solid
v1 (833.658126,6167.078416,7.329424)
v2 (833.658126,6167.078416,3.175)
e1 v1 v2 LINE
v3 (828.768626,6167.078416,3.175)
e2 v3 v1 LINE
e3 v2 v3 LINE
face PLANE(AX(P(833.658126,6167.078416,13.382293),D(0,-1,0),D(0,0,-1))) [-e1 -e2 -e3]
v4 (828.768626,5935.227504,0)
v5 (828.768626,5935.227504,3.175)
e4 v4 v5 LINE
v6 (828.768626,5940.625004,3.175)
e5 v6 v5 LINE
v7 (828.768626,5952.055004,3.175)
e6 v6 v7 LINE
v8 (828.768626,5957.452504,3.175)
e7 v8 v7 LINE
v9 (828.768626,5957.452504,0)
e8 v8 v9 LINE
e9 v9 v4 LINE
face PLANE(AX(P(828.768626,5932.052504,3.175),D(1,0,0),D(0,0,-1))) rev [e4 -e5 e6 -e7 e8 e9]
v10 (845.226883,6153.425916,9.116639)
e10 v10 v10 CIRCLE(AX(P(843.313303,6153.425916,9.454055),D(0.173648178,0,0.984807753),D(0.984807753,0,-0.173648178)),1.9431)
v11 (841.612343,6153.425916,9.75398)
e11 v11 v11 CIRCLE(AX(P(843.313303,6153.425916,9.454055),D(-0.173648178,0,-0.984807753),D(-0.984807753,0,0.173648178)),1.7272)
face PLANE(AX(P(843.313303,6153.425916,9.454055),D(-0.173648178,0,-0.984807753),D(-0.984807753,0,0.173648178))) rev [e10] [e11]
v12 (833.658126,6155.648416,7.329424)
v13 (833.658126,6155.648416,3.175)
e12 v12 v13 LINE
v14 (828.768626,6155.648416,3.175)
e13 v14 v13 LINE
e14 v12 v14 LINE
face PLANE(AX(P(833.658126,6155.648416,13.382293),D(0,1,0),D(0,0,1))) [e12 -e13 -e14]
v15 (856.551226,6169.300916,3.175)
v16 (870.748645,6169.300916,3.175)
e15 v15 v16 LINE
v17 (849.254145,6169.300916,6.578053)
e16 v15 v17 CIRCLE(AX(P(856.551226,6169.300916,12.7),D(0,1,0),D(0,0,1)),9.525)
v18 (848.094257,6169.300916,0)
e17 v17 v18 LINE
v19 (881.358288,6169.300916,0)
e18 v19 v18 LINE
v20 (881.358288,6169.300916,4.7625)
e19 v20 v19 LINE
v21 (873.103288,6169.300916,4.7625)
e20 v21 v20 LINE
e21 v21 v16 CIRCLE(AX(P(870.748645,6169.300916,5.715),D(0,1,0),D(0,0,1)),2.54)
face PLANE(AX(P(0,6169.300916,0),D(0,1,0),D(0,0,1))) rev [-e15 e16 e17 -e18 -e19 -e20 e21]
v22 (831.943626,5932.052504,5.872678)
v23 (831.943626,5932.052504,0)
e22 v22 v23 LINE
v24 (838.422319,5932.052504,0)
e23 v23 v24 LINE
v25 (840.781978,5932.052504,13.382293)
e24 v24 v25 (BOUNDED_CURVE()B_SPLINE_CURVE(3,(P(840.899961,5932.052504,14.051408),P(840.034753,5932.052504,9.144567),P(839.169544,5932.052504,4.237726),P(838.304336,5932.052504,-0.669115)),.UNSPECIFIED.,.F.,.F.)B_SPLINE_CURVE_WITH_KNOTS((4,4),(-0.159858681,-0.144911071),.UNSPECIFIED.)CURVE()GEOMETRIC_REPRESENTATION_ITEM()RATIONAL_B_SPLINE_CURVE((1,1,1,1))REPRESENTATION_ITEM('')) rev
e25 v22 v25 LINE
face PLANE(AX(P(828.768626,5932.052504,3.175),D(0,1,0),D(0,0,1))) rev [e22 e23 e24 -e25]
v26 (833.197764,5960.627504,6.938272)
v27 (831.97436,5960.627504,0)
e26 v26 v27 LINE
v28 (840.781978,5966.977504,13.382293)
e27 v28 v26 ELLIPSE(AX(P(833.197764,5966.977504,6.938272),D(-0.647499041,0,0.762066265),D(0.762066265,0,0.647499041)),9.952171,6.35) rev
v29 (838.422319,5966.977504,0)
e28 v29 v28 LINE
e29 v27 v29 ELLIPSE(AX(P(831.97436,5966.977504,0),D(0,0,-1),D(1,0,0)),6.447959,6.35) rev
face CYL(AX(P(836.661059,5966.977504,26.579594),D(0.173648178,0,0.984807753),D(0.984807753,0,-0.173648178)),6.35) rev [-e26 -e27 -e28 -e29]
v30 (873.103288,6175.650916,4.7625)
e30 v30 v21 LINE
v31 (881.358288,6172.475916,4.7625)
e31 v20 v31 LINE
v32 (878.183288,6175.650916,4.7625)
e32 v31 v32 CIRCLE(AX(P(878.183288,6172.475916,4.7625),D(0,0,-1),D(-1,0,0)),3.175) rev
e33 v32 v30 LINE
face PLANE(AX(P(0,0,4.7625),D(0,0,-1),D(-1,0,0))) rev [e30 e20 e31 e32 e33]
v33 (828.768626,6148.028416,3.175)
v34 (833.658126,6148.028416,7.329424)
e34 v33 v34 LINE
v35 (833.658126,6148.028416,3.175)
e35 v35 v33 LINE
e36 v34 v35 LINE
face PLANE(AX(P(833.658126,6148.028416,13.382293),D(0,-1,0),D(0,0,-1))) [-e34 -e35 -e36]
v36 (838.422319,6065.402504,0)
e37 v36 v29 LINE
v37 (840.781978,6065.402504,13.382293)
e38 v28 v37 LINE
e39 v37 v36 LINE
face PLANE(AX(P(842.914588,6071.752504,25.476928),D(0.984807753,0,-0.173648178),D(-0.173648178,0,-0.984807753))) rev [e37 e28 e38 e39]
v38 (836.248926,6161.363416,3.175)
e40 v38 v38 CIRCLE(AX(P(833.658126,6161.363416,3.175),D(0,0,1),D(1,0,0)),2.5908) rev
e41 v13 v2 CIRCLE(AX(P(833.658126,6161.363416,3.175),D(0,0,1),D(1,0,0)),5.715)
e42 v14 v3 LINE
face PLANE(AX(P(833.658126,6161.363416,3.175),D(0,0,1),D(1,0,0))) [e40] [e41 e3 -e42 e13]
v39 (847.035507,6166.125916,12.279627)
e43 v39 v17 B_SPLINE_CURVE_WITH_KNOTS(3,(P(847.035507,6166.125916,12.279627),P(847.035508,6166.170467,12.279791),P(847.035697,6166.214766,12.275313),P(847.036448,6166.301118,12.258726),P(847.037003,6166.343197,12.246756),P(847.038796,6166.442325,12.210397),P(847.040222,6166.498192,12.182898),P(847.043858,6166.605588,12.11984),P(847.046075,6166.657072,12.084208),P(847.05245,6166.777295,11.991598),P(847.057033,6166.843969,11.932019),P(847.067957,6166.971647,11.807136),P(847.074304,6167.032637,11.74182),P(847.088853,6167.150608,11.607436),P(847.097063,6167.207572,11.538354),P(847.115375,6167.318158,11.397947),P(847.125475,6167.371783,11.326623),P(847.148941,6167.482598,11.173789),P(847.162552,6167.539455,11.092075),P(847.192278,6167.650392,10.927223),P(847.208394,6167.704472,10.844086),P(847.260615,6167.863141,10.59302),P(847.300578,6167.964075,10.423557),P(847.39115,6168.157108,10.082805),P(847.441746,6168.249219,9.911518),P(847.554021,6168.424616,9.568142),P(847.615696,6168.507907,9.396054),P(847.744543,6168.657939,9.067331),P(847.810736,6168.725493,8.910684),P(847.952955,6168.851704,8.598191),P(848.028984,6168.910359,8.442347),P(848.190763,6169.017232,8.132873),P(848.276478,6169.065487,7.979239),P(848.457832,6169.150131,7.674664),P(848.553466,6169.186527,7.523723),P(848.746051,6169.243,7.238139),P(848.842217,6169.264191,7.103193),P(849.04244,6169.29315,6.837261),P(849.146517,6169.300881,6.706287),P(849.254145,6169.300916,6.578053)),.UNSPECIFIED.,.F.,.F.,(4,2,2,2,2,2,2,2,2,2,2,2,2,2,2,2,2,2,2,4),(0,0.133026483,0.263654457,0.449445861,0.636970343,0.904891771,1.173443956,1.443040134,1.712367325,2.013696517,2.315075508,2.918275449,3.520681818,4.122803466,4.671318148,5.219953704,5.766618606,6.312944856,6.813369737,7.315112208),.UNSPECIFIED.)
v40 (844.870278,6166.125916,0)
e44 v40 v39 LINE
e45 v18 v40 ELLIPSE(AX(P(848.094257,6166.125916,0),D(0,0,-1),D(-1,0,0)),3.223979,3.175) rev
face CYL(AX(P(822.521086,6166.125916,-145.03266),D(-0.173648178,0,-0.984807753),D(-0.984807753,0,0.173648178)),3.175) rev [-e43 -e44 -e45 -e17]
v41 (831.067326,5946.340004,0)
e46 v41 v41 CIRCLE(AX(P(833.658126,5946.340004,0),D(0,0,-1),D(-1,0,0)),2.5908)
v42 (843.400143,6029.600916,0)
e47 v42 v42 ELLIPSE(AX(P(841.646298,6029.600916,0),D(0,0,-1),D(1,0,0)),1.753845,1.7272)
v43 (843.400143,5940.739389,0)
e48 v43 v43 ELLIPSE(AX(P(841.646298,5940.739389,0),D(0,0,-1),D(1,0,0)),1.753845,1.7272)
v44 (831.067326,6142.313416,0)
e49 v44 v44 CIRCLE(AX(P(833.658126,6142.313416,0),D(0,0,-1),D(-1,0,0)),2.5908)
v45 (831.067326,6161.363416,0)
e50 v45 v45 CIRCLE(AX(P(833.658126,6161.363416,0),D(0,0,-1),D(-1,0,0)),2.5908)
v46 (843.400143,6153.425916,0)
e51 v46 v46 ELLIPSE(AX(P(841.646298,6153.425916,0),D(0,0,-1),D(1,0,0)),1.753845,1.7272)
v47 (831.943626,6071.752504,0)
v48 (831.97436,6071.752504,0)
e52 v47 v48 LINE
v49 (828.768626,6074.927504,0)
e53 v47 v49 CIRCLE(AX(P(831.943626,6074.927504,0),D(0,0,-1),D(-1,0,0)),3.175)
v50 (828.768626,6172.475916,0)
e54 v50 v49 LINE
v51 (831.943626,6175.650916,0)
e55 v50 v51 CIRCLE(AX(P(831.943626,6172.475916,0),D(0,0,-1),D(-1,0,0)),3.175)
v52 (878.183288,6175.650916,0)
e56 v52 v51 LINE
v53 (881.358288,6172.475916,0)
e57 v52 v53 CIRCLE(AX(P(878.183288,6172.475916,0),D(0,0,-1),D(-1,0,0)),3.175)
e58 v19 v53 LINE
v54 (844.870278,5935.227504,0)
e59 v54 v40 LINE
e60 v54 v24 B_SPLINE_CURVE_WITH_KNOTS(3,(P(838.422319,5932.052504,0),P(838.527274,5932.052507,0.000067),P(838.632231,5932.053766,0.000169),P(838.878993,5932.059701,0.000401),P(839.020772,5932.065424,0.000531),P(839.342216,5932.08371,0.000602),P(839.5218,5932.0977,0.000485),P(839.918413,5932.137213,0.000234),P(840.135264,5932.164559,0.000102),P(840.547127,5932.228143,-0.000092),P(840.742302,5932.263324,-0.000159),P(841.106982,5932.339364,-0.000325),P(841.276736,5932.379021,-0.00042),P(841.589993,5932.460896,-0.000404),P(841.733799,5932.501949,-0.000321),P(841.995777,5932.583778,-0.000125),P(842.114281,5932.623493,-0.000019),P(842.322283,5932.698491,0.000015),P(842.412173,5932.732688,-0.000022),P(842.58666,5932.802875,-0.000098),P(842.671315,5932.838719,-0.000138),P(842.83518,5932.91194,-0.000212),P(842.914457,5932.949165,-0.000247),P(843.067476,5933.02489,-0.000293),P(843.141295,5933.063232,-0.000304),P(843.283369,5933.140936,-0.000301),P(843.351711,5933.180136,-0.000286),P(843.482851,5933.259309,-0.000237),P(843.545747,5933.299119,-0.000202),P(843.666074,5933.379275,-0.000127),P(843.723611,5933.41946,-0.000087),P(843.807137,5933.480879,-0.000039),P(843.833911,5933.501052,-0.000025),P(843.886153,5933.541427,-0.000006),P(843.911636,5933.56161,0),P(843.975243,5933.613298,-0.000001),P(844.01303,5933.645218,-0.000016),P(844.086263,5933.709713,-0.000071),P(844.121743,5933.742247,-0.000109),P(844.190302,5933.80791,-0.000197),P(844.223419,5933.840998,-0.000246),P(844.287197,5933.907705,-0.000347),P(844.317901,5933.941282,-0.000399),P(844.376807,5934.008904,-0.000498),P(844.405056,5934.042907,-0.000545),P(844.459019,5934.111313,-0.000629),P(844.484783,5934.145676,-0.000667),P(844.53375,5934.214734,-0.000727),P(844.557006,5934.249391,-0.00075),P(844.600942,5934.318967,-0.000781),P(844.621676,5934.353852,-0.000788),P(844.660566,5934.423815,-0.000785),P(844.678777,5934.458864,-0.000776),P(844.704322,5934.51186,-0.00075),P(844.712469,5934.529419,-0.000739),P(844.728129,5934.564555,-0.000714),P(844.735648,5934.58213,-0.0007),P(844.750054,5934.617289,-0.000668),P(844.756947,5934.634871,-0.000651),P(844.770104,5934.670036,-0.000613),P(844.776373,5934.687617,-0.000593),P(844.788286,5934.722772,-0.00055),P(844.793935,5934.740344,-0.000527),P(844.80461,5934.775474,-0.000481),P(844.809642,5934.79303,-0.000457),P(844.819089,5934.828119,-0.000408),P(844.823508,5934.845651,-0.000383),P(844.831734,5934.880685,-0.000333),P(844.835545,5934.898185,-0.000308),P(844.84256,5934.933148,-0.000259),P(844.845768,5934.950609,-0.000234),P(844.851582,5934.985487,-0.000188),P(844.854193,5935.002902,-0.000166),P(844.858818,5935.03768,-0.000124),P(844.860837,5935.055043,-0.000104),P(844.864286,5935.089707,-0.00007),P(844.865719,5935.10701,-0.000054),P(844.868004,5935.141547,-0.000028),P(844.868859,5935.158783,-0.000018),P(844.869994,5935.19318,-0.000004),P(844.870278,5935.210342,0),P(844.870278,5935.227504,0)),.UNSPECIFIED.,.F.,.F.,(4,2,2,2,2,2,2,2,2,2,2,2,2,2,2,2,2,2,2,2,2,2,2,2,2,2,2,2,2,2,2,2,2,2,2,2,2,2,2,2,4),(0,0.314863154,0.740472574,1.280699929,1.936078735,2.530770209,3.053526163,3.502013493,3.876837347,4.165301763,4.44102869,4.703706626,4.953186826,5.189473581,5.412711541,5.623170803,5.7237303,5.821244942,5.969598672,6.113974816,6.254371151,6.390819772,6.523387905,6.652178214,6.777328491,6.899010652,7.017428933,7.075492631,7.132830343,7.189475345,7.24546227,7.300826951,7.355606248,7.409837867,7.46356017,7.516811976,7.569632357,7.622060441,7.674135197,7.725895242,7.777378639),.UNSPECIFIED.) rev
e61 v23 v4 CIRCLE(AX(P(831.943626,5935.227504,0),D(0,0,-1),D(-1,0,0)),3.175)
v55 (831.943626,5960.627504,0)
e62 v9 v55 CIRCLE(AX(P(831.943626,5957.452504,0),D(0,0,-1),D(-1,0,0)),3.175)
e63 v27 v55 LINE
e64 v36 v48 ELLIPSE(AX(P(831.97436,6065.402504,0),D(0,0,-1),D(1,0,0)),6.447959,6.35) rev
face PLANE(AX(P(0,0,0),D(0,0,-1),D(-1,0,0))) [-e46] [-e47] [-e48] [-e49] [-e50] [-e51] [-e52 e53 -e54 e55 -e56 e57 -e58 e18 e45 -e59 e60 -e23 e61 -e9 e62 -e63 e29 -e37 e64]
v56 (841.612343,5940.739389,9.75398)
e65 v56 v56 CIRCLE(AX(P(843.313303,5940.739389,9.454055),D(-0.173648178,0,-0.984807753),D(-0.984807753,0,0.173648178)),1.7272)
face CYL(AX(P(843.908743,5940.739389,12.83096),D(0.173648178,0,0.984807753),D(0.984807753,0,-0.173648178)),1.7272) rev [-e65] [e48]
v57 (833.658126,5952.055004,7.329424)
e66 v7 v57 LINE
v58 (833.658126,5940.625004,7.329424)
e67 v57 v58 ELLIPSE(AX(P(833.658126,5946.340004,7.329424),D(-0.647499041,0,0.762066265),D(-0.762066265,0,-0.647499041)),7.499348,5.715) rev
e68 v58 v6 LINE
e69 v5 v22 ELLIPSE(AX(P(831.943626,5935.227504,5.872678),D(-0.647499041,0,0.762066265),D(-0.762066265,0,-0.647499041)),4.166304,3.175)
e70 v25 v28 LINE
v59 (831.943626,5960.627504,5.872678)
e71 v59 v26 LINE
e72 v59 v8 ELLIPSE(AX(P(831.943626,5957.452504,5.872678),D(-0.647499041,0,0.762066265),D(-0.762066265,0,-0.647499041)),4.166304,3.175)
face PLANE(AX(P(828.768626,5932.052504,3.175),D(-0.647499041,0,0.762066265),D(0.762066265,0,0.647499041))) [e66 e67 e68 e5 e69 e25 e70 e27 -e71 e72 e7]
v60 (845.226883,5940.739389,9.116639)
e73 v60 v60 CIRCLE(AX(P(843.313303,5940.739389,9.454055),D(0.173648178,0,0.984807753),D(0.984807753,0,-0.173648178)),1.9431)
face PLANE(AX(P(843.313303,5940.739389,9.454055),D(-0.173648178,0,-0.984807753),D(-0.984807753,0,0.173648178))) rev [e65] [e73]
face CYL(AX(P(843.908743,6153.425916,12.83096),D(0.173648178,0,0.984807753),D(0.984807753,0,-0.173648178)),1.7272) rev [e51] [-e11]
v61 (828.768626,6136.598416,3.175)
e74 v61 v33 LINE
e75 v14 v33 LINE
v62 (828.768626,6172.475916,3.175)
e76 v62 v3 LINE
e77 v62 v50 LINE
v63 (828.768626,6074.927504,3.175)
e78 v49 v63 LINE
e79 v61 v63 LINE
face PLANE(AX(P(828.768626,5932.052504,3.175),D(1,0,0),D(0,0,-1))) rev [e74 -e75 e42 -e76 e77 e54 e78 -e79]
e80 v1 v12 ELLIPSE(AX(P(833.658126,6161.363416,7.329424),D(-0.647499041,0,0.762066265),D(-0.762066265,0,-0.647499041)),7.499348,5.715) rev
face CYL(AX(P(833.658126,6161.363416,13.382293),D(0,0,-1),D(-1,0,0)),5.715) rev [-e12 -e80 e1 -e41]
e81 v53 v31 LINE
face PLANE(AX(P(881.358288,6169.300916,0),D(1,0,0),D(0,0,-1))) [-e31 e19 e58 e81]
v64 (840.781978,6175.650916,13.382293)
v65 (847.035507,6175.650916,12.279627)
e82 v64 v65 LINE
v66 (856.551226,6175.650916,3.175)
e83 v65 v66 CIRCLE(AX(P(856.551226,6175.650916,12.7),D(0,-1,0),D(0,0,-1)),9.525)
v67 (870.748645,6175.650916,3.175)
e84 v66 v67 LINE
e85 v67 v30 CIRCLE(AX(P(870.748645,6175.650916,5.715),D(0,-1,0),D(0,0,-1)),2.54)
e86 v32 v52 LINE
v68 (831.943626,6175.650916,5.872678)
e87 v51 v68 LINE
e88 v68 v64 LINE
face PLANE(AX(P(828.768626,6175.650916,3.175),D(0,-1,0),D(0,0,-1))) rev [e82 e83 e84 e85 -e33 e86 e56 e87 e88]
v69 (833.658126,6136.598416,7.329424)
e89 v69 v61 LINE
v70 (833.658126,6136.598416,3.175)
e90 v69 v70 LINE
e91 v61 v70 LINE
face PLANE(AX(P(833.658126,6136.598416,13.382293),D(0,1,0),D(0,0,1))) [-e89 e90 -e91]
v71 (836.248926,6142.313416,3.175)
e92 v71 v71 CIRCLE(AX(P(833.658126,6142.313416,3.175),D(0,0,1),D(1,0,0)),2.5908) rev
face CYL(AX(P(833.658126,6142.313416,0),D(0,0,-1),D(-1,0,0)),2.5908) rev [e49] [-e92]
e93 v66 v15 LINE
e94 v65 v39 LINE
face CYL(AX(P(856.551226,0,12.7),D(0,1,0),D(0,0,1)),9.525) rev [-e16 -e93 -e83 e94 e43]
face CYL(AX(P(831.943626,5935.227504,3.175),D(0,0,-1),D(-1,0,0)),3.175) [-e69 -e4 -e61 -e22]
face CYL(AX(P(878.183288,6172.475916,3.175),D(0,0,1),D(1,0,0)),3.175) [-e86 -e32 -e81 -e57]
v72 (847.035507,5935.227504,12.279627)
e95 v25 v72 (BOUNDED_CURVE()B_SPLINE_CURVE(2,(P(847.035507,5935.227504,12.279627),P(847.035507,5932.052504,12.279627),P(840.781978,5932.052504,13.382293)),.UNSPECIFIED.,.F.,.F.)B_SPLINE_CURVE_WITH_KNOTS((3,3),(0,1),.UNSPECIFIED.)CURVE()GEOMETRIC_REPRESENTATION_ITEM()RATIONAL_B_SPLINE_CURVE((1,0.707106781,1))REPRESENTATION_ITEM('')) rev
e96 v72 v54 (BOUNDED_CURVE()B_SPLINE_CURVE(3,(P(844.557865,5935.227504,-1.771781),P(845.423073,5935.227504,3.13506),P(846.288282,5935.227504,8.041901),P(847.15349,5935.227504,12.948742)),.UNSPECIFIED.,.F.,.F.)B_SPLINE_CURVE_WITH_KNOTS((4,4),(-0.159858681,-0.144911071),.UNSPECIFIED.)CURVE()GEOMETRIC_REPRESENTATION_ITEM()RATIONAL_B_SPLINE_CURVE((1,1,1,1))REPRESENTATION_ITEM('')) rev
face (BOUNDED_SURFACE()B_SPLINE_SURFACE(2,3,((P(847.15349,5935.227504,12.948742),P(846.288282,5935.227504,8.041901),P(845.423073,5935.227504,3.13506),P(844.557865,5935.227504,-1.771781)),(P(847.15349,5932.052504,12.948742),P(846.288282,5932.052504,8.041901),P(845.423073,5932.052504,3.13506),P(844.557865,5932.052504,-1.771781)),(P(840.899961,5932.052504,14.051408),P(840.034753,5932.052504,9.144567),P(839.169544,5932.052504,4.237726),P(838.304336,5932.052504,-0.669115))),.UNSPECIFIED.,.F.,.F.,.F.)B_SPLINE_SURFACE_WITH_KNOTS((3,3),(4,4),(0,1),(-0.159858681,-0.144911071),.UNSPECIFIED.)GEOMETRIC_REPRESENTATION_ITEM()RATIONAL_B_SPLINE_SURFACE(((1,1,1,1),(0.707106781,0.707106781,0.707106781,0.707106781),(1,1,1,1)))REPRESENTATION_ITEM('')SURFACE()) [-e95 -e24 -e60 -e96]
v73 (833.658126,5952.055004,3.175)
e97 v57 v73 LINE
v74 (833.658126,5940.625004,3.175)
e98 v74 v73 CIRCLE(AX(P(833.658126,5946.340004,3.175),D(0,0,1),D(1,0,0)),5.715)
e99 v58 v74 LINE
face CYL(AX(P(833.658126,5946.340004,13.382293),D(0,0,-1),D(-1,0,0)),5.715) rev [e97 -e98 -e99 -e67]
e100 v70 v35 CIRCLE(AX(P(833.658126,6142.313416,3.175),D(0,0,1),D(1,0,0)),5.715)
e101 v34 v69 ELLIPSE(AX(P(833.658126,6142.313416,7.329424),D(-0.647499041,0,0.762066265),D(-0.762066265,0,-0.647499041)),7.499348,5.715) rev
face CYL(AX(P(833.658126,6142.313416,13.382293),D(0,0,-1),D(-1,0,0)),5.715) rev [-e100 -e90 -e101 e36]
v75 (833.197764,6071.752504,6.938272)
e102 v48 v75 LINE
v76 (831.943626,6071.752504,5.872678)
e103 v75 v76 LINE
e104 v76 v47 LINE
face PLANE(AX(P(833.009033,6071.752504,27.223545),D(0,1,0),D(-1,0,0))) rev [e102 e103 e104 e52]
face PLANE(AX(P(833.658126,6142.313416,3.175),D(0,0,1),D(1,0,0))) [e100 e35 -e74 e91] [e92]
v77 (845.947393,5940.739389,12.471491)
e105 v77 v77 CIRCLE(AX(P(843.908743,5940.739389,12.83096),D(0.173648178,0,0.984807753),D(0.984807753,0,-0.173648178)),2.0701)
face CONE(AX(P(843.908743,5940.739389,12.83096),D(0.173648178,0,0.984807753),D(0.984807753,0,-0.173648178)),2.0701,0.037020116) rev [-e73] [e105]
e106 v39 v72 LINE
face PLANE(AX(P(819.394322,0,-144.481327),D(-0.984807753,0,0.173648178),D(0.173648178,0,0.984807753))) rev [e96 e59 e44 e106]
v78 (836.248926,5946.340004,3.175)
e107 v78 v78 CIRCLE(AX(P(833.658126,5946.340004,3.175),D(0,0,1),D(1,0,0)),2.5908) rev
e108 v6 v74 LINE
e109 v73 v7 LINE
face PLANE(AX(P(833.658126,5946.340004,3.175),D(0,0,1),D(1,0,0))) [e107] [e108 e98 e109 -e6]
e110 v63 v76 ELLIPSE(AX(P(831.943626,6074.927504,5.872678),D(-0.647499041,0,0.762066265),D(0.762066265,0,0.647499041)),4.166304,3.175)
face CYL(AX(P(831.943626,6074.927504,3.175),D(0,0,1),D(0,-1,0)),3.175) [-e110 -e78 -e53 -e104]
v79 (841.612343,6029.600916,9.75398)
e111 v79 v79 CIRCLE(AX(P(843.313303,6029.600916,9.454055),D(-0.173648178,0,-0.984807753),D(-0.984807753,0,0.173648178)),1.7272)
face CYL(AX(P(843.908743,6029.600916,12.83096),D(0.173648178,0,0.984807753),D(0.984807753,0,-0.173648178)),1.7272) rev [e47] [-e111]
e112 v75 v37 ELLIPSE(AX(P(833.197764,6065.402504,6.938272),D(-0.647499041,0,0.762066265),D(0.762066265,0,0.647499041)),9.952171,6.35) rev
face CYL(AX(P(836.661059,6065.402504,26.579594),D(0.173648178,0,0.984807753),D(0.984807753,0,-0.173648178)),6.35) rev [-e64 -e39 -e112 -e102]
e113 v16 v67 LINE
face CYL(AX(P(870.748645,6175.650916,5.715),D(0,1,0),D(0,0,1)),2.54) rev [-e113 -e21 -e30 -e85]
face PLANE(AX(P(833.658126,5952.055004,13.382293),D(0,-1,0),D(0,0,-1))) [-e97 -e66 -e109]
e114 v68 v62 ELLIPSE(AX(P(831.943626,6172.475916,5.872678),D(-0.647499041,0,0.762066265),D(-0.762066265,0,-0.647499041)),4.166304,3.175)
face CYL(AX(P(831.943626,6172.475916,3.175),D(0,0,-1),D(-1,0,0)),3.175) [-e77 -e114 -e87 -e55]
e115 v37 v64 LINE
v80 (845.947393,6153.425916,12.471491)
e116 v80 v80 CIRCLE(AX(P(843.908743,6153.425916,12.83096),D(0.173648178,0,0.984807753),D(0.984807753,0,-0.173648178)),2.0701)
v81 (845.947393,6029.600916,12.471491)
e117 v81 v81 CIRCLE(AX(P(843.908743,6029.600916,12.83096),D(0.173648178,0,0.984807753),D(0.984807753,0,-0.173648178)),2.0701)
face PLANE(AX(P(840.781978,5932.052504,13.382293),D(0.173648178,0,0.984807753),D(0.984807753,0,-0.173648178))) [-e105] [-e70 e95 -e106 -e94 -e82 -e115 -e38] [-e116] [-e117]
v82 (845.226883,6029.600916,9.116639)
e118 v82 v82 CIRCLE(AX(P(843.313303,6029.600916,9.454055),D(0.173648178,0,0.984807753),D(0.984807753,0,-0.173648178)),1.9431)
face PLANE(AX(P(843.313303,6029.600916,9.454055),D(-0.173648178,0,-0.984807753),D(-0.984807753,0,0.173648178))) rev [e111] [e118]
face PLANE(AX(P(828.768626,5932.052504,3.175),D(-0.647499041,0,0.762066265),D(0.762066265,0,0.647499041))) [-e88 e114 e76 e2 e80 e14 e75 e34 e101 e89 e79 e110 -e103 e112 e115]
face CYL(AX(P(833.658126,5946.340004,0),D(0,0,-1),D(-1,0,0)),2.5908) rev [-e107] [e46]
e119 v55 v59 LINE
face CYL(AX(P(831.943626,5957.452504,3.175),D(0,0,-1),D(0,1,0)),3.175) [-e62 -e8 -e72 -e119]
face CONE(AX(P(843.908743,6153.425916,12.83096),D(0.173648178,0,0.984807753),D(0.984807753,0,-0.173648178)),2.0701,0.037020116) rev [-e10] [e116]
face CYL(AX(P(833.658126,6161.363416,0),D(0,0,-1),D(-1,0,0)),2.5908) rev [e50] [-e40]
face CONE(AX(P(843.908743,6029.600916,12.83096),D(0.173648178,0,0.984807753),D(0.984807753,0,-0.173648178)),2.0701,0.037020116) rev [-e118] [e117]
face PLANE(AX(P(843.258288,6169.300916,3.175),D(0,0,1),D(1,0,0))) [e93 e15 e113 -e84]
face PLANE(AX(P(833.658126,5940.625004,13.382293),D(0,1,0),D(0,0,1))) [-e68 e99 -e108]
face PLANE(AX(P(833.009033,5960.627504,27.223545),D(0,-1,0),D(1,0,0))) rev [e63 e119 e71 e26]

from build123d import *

# Parameters (mm, degrees)
SKETCH2_W                  = 82.738044028
SKETCH2_H                  = 243.598411898
BOSS_EXTRUDE1_DEPTH        = 3.175
BOSS_EXTRUDE2_DEPTH        = 243.598412
CUT_EXTRUDE1_DEPTH         = 6253.234293578
CUT_EXTRUDE1_DEPTH_BACK    = 6253.234293578
SKETCH3_W                  = 10.058364279
SKETCH3_H                  = 111.125
FILLET1_R                  = 6.35
CUT_EXTRUDE2_DEPTH         = 6243.564603497
DELETEFACE2_START          = 830.447299741
DELETEFACE2_OUTLINE_W      = 243.598411898
DELETEFACE2_OUTLINE_H      = 6
DELETEFACE2_DEPTH          = 0.551332964
F_6_0_204_DIAMETER_HOLE1_D = 5.1816
CUT_EXTRUDE3_START         = 3.175
CUT_EXTRUDE3_DEPTH         = 6231.095925463
SKETCH10_W                 = 38.1
SKETCH10_H                 = 3.175
BOSS_EXTRUDE4_DEPTH        = 6.35
BOSS_EXTRUDE6_DEPTH        = 1.5875
CUT_EXTRUDE4_DEPTH         = 913.829845298
FILLET2_R                  = 9.525
FILLET3_R                  = 3.175
SKETCH13_W                 = 8.255
SKETCH13_H                 = 6.35
BOSS_EXTRUDE5_DEPTH        = 1.5875
FILLET4_R                  = 2.54
FILLET5_SIZE               = 6.35
FILLET5_SIZE_2             = 3.175
FILLET6_R                  = 3.175
HOLE1_AT_2_COUNT           = 2
HOLE1_AT_2_PITCH           = 123.825
HOLE1_AT_3_COUNT           = 2
HOLE1_AT_3_PITCH           = 212.6865263
F_4_CLEARANCE_HOLE1_D      = 3.4544


# Read off the part's stored shape, not the designer's step: DeleteFace2
with BuildPart() as part:
    # Sketch2 → Boss-Extrude1 (new body)
    with BuildSketch(Plane.XY):
        with Locations((870.137648104, 6053.851709568)):
            Rectangle(SKETCH2_W, SKETCH2_H)
    extrude(amount=BOSS_EXTRUDE1_DEPTH)

    # Sketch5 → Boss-Extrude2 (add, through all)
    with BuildSketch(Plane(origin=(0, 6175.650915517, 0), x_dir=(1, 0, 0), z_dir=(0, 1, 0))):
        Polygon((828.76862609, -3.175), (840.781978058, -13.382293294), (845.472124982, -12.555293847), (843.81812609, -3.175), align=None)
    extrude(amount=-BOSS_EXTRUDE2_DEPTH)

    # Sketch3 → Cut-Extrude1 (cut, two sides: drawn at the far end of the back side and taken through both)
    with BuildSketch(Plane(origin=(1789.89403363, 0, -153.971769821), x_dir=(-0.9848077530122082, 0, 0.17364817766692958), z_dir=(-0.17364817766692958, 0, -0.9848077530122082)).offset(-CUT_EXTRUDE1_DEPTH_BACK)):
        with Locations((968.782821029, 6016.190003619)):
            Rectangle(SKETCH3_W, SKETCH3_H)
    extrude(amount=CUT_EXTRUDE1_DEPTH + CUT_EXTRUDE1_DEPTH_BACK, mode=Mode.SUBTRACT)

    # Fillet1
    fillet1_edges = [part.edges().sort_by_distance(p)[0] for p in [
        (839.602148372, 6071.752503619, 6.691146647),
        (839.602148372, 5960.627503619, 6.691146647),
    ]]
    fillet(fillet1_edges, radius=FILLET1_R)

    # Sketch4 → Cut-Extrude2 (cut, through all)
    with BuildSketch(Plane.XY.offset(3.175)):
        Polygon((843.81812609, 6170.570915517), (843.81812609, 6175.650915517), (911.506670118, 6175.650915517), (911.506670118, 5932.052503619), (905.156670118, 5932.052503619), (843.81812609, 5932.052503619), align=None)
    extrude(amount=-CUT_EXTRUDE2_DEPTH, mode=Mode.SUBTRACT)

    # DeleteFace2 outline → DeleteFace2 (cut)
    with BuildSketch(Plane(origin=(0, 0, 0), x_dir=(0, 1, 0), z_dir=(0.984807753012209, 0, -0.173648177666925)).offset(DELETEFACE2_START)):
        with Locations((6053.851709568, 148)):
            Rectangle(DELETEFACE2_OUTLINE_W, DELETEFACE2_OUTLINE_H)
    extrude(amount=DELETEFACE2_DEPTH, mode=Mode.SUBTRACT)

    # #6 (0.204) Diameter Hole1 (through all)
    with Locations(Plane(origin=(0, 0, 0), x_dir=(-1, 0, 0), z_dir=(0, 0, -1))):
        with Locations((-833.65812609, 6161.363415517), (-833.65812609, 6142.313415517), (-833.65812609, 5946.340003619)):
            Hole(F_6_0_204_DIAMETER_HOLE1_D / 2)

    # Sketch8 → Cut-Extrude3 (cut, through all)
    with BuildSketch(Plane.XY.offset(CUT_EXTRUDE3_START)):
        with BuildLine():
            Line((833.65812609, 6155.648415517), (828.76862609, 6155.648415517))
            ThreePointArc((828.76862609, 6155.648415517), (823.05362609, 6161.363415517), (828.76862609, 6167.078415517))
            Line((828.76862609, 6167.078415517), (833.65812609, 6167.078415517))
            ThreePointArc((833.65812609, 6167.078415517), (839.37312609, 6161.363415517), (833.65812609, 6155.648415517))
        make_face()
        with BuildLine():
            Line((833.65812609, 6136.598415517), (828.76862609, 6136.598415517))
            ThreePointArc((828.76862609, 6136.598415517), (823.05362609, 6142.313415517), (828.76862609, 6148.028415517))
            Line((828.76862609, 6148.028415517), (833.65812609, 6148.028415517))
            ThreePointArc((833.65812609, 6148.028415517), (839.37312609, 6142.313415517), (833.65812609, 6136.598415517))
        make_face()
        with BuildLine():
            Line((833.65812609, 5940.625003619), (828.76862609, 5940.625003619))
            ThreePointArc((828.76862609, 5940.625003619), (823.05362609, 5946.340003619), (828.76862609, 5952.055003619))
            Line((828.76862609, 5952.055003619), (833.65812609, 5952.055003619))
            ThreePointArc((833.65812609, 5952.055003619), (839.37312609, 5946.340003619), (833.65812609, 5940.625003619))
        make_face()
    extrude(amount=CUT_EXTRUDE3_DEPTH, mode=Mode.SUBTRACT)

    # Sketch10 → Boss-Extrude4 (add)
    with BuildSketch(Plane(origin=(0, 6175.650915517, 0), x_dir=(1, 0, 0), z_dir=(0, 1, 0))):
        with Locations((862.308287926, -1.5875)):
            Rectangle(SKETCH10_W, SKETCH10_H)
    extrude(amount=-BOSS_EXTRUDE4_DEPTH)

    # Sketch14 → Boss-Extrude6 (add)
    with BuildSketch(Plane(origin=(817.830939253, 0, -144.205660248), x_dir=(-0.17364817766692534, 0, -0.9848077530122089), z_dir=(0.9848077530122089, 0, -0.17364817766692534))):
        Polygon((-149.654244494, 6169.300915517), (-149.654244494, 6175.650915517), (-159.179244494, 6175.650915517), (-159.179244494, 5932.052503619), (-146.430265001, 5932.052503619), (-146.430265001, 6169.300915517), align=None)
    extrude(amount=BOSS_EXTRUDE6_DEPTH)

    # Sketch15 → Cut-Extrude4 (cut, through all)
    with BuildSketch(Plane(origin=(0, 6169.300915517, 0), x_dir=(1, 0, 0), z_dir=(0, 1, 0))):
        Polygon((843.258287926, 0), (844.870277672, 0), (844.821670234, 0.275666482), align=None)
    extrude(amount=-CUT_EXTRUDE4_DEPTH, mode=Mode.SUBTRACT)

    # Fillet2
    # the kernel refuses this fillet: 9.525 mm, written as the material it adds along each edge
    with BuildSketch(Plane(origin=(845.430115836, 6175.650915517, 3.175), x_dir=(1, 0, 0), z_dir=(0, -1, 0))) as fillet2_piece_1:
        with BuildLine():
            CenterArc((11.121110651, 9.525), FILLET2_R, 182.529491184, 87.470508816)
            Line((1.605391454, 9.104627365), (1.41507707, 9.096219913))
            ThreePointArc((1.41507707, 9.096219913), (0.61508985, 4.585393661), (-0.187605877, 0.033079978))
            Line((-0.187605877, 0.033079978), (0, -0.1905))
            Line((0, -0.1905), (11.121110651, -0.1905))
            Line((11.121110651, -0.1905), (11.121110651, 0))
        make_face()
    extrude(amount=6.35)

    # Fillet3
    # the kernel refuses this fillet: 3.175 mm, written as the material it adds along each edge
    with BuildSketch(Plane(origin=(847.03550729, 6169.300915517, 12.279627365), x_dir=(0.9848077530122001, 0, -0.17364817766697505), z_dir=(-0.17364817766697507, 0, -0.9848077530122002))) as fillet3_piece_1_section:
        with BuildLine():
            CenterArc((FILLET3_R, FILLET3_R), FILLET3_R, 180, 90)
            Line((0, FILLET3_R), (0, 0))
            Line((0, 0), (FILLET3_R, 0))
        make_face()
    fillet3_piece_1 = extrude(amount=20.406560411, mode=Mode.PRIVATE)
    fillet3_piece_1 = fillet3_piece_1 - Plane(origin=(856.551226487, 6168.523076842, 12.7), x_dir=(1, 0, 0), z_dir=(0, 1, 0)) * Cylinder(9.525, 54, mode=Mode.PRIVATE)
    fillet3_piece_1 = split(fillet3_piece_1, bisect_by=Plane(origin=(846.439228991, 6168.523076842, 0), z_dir=(0, 0, 1)), keep=Keep.TOP, mode=Mode.PRIVATE)
    add(fillet3_piece_1)

    # Sketch13 → Boss-Extrude5 (add)
    with BuildSketch(Plane.XY.offset(3.175)):
        with Locations((877.230787926, 6172.475915517)):
            Rectangle(SKETCH13_W, SKETCH13_H)
    extrude(amount=BOSS_EXTRUDE5_DEPTH)

    # Fillet4
    # the kernel refuses this fillet: 2.54 mm, written as the material it adds along each edge
    with BuildSketch(Plane(origin=(873.103287926, 6175.650915517, 3.175), x_dir=(-1, 0, 0), z_dir=(0, -1, 0))) as fillet4_piece_1:
        with BuildLine():
            CenterArc((2.35464302, -2.54), FILLET4_R, 90, 67.975687163)
            Line((0, -1.5875), (-0.04709286, -1.56845))
            ThreePointArc((-0.04709286, -1.56845), (-0.0508, -0.79375), (-0.0508, 0))
            Line((-0.0508, 0), (0, 0.0508))
            Line((0, 0.0508), (2.35464302, 0.0508))
            Line((2.35464302, 0.0508), (2.35464302, 0))
        make_face()
    extrude(amount=6.35)

    # Fillet5
    # an asymmetric fillet: 6.35, 3.175 mm, written as the material it takes off along each edge
    with BuildSketch(Plane(origin=(849.79217211, 5932.052503619, 27.913450444), x_dir=(-0.9848077530122089, 0, 0.17364817766692534), z_dir=(-0.17364817766692536, 0, -0.984807753012209))) as fillet5_piece_1:
        with BuildLine():
            Bezier((FILLET5_SIZE, 0), (0, 0), (0, FILLET5_SIZE_2), weights=[1, 0.707106781, 1])
            Line((0, FILLET5_SIZE_2), (0, 0))
            Line((0, 0), (FILLET5_SIZE, 0))
        make_face()
    extrude(amount=44.219060411, mode=Mode.SUBTRACT)

    # Fillet6
    # the kernel refuses this fillet: 3.175 mm, written as the material it takes off along each edge
    with BuildSketch(Plane(origin=(828.76862609, 6175.650915517, -7.9375), x_dir=(1, 0, 0), z_dir=(0, 0, 1))) as fillet6_piece_1:
        with BuildLine():
            CenterArc((FILLET6_R, -FILLET6_R), FILLET6_R, 90, 90)
            Line((0, -FILLET6_R), (0, 0))
            Line((0, 0), (FILLET6_R, 0))
        make_face()
    extrude(amount=19.05, mode=Mode.SUBTRACT)
    with BuildSketch(Plane(origin=(828.76862609, 5932.052503619, -7.9375), x_dir=(1, 0, 0), z_dir=(0, 0, 1)), Plane(origin=(828.76862609, 5960.627503619, -7.9375), x_dir=(0, -1, 0), z_dir=(0, 0, 1)), Plane(origin=(828.76862609, 6071.752503619, 11.1125), x_dir=(0, 1, 0), z_dir=(0, 0, -1))) as fillet6_piece_2:
        with BuildLine():
            CenterArc((FILLET6_R, FILLET6_R), FILLET6_R, 180, 90)
            Line((0, FILLET6_R), (0, 0))
            Line((0, 0), (FILLET6_R, 0))
        make_face()
    extrude(amount=19.05, mode=Mode.SUBTRACT)
    with BuildSketch(Plane(origin=(881.358287926, 6175.650915517, -7.9375), x_dir=(-1, 0, 0), z_dir=(0, 0, 1))) as fillet6_piece_3:
        with BuildLine():
            CenterArc((FILLET6_R, FILLET6_R), FILLET6_R, 180, 90)
            Line((0, FILLET6_R), (0, 0))
            Line((0, 0), (FILLET6_R, 0))
        make_face()
    extrude(amount=20.6375, mode=Mode.SUBTRACT)

    # Sketch17 → Hole1 (revolve, cut)
    with BuildSketch(Plane(origin=(843.908742674, 6153.425915517, 12.830960329), x_dir=(0.9848077530122085, 0, -0.17364817766692853), z_dir=(0, 1, 0))):
        Polygon((0, 0), (0, 3.429), (1.9431, 3.429), (2.0701, 0), align=None)
    hole1 = revolve(axis=Axis((824.807443131, 6153.425915517, -95.497892502), (0.1736481776669289, 0, 0.9848077530122084)), mode=Mode.SUBTRACT)

    # Hole1 at 2: Hole1 ×2
    with Locations(*[(0, -i * HOLE1_AT_2_PITCH, 0) for i in range(1, HOLE1_AT_2_COUNT)]):
        add(hole1, mode=Mode.SUBTRACT)

    # Hole1 at 3: Hole1 ×2
    with Locations(*[(0, -i * HOLE1_AT_3_PITCH, 0) for i in range(1, HOLE1_AT_3_COUNT)]):
        add(hole1, mode=Mode.SUBTRACT)

    # #4 Clearance Hole1 (through all)
    with Locations(Plane(origin=(27.641185729, 0, 156.760954096), x_dir=(0.9848077530122085, 0, -0.17364817766692853), z_dir=(0.17364817766692853, 0, 0.9848077530122085))):
        with Locations((828.859799741, 5940.739389217), (828.859799741, 6029.600915517), (828.859799741, 6153.425915517)):
            Hole(F_4_CLEARANCE_HOLE1_D / 2)


solid = part.part
